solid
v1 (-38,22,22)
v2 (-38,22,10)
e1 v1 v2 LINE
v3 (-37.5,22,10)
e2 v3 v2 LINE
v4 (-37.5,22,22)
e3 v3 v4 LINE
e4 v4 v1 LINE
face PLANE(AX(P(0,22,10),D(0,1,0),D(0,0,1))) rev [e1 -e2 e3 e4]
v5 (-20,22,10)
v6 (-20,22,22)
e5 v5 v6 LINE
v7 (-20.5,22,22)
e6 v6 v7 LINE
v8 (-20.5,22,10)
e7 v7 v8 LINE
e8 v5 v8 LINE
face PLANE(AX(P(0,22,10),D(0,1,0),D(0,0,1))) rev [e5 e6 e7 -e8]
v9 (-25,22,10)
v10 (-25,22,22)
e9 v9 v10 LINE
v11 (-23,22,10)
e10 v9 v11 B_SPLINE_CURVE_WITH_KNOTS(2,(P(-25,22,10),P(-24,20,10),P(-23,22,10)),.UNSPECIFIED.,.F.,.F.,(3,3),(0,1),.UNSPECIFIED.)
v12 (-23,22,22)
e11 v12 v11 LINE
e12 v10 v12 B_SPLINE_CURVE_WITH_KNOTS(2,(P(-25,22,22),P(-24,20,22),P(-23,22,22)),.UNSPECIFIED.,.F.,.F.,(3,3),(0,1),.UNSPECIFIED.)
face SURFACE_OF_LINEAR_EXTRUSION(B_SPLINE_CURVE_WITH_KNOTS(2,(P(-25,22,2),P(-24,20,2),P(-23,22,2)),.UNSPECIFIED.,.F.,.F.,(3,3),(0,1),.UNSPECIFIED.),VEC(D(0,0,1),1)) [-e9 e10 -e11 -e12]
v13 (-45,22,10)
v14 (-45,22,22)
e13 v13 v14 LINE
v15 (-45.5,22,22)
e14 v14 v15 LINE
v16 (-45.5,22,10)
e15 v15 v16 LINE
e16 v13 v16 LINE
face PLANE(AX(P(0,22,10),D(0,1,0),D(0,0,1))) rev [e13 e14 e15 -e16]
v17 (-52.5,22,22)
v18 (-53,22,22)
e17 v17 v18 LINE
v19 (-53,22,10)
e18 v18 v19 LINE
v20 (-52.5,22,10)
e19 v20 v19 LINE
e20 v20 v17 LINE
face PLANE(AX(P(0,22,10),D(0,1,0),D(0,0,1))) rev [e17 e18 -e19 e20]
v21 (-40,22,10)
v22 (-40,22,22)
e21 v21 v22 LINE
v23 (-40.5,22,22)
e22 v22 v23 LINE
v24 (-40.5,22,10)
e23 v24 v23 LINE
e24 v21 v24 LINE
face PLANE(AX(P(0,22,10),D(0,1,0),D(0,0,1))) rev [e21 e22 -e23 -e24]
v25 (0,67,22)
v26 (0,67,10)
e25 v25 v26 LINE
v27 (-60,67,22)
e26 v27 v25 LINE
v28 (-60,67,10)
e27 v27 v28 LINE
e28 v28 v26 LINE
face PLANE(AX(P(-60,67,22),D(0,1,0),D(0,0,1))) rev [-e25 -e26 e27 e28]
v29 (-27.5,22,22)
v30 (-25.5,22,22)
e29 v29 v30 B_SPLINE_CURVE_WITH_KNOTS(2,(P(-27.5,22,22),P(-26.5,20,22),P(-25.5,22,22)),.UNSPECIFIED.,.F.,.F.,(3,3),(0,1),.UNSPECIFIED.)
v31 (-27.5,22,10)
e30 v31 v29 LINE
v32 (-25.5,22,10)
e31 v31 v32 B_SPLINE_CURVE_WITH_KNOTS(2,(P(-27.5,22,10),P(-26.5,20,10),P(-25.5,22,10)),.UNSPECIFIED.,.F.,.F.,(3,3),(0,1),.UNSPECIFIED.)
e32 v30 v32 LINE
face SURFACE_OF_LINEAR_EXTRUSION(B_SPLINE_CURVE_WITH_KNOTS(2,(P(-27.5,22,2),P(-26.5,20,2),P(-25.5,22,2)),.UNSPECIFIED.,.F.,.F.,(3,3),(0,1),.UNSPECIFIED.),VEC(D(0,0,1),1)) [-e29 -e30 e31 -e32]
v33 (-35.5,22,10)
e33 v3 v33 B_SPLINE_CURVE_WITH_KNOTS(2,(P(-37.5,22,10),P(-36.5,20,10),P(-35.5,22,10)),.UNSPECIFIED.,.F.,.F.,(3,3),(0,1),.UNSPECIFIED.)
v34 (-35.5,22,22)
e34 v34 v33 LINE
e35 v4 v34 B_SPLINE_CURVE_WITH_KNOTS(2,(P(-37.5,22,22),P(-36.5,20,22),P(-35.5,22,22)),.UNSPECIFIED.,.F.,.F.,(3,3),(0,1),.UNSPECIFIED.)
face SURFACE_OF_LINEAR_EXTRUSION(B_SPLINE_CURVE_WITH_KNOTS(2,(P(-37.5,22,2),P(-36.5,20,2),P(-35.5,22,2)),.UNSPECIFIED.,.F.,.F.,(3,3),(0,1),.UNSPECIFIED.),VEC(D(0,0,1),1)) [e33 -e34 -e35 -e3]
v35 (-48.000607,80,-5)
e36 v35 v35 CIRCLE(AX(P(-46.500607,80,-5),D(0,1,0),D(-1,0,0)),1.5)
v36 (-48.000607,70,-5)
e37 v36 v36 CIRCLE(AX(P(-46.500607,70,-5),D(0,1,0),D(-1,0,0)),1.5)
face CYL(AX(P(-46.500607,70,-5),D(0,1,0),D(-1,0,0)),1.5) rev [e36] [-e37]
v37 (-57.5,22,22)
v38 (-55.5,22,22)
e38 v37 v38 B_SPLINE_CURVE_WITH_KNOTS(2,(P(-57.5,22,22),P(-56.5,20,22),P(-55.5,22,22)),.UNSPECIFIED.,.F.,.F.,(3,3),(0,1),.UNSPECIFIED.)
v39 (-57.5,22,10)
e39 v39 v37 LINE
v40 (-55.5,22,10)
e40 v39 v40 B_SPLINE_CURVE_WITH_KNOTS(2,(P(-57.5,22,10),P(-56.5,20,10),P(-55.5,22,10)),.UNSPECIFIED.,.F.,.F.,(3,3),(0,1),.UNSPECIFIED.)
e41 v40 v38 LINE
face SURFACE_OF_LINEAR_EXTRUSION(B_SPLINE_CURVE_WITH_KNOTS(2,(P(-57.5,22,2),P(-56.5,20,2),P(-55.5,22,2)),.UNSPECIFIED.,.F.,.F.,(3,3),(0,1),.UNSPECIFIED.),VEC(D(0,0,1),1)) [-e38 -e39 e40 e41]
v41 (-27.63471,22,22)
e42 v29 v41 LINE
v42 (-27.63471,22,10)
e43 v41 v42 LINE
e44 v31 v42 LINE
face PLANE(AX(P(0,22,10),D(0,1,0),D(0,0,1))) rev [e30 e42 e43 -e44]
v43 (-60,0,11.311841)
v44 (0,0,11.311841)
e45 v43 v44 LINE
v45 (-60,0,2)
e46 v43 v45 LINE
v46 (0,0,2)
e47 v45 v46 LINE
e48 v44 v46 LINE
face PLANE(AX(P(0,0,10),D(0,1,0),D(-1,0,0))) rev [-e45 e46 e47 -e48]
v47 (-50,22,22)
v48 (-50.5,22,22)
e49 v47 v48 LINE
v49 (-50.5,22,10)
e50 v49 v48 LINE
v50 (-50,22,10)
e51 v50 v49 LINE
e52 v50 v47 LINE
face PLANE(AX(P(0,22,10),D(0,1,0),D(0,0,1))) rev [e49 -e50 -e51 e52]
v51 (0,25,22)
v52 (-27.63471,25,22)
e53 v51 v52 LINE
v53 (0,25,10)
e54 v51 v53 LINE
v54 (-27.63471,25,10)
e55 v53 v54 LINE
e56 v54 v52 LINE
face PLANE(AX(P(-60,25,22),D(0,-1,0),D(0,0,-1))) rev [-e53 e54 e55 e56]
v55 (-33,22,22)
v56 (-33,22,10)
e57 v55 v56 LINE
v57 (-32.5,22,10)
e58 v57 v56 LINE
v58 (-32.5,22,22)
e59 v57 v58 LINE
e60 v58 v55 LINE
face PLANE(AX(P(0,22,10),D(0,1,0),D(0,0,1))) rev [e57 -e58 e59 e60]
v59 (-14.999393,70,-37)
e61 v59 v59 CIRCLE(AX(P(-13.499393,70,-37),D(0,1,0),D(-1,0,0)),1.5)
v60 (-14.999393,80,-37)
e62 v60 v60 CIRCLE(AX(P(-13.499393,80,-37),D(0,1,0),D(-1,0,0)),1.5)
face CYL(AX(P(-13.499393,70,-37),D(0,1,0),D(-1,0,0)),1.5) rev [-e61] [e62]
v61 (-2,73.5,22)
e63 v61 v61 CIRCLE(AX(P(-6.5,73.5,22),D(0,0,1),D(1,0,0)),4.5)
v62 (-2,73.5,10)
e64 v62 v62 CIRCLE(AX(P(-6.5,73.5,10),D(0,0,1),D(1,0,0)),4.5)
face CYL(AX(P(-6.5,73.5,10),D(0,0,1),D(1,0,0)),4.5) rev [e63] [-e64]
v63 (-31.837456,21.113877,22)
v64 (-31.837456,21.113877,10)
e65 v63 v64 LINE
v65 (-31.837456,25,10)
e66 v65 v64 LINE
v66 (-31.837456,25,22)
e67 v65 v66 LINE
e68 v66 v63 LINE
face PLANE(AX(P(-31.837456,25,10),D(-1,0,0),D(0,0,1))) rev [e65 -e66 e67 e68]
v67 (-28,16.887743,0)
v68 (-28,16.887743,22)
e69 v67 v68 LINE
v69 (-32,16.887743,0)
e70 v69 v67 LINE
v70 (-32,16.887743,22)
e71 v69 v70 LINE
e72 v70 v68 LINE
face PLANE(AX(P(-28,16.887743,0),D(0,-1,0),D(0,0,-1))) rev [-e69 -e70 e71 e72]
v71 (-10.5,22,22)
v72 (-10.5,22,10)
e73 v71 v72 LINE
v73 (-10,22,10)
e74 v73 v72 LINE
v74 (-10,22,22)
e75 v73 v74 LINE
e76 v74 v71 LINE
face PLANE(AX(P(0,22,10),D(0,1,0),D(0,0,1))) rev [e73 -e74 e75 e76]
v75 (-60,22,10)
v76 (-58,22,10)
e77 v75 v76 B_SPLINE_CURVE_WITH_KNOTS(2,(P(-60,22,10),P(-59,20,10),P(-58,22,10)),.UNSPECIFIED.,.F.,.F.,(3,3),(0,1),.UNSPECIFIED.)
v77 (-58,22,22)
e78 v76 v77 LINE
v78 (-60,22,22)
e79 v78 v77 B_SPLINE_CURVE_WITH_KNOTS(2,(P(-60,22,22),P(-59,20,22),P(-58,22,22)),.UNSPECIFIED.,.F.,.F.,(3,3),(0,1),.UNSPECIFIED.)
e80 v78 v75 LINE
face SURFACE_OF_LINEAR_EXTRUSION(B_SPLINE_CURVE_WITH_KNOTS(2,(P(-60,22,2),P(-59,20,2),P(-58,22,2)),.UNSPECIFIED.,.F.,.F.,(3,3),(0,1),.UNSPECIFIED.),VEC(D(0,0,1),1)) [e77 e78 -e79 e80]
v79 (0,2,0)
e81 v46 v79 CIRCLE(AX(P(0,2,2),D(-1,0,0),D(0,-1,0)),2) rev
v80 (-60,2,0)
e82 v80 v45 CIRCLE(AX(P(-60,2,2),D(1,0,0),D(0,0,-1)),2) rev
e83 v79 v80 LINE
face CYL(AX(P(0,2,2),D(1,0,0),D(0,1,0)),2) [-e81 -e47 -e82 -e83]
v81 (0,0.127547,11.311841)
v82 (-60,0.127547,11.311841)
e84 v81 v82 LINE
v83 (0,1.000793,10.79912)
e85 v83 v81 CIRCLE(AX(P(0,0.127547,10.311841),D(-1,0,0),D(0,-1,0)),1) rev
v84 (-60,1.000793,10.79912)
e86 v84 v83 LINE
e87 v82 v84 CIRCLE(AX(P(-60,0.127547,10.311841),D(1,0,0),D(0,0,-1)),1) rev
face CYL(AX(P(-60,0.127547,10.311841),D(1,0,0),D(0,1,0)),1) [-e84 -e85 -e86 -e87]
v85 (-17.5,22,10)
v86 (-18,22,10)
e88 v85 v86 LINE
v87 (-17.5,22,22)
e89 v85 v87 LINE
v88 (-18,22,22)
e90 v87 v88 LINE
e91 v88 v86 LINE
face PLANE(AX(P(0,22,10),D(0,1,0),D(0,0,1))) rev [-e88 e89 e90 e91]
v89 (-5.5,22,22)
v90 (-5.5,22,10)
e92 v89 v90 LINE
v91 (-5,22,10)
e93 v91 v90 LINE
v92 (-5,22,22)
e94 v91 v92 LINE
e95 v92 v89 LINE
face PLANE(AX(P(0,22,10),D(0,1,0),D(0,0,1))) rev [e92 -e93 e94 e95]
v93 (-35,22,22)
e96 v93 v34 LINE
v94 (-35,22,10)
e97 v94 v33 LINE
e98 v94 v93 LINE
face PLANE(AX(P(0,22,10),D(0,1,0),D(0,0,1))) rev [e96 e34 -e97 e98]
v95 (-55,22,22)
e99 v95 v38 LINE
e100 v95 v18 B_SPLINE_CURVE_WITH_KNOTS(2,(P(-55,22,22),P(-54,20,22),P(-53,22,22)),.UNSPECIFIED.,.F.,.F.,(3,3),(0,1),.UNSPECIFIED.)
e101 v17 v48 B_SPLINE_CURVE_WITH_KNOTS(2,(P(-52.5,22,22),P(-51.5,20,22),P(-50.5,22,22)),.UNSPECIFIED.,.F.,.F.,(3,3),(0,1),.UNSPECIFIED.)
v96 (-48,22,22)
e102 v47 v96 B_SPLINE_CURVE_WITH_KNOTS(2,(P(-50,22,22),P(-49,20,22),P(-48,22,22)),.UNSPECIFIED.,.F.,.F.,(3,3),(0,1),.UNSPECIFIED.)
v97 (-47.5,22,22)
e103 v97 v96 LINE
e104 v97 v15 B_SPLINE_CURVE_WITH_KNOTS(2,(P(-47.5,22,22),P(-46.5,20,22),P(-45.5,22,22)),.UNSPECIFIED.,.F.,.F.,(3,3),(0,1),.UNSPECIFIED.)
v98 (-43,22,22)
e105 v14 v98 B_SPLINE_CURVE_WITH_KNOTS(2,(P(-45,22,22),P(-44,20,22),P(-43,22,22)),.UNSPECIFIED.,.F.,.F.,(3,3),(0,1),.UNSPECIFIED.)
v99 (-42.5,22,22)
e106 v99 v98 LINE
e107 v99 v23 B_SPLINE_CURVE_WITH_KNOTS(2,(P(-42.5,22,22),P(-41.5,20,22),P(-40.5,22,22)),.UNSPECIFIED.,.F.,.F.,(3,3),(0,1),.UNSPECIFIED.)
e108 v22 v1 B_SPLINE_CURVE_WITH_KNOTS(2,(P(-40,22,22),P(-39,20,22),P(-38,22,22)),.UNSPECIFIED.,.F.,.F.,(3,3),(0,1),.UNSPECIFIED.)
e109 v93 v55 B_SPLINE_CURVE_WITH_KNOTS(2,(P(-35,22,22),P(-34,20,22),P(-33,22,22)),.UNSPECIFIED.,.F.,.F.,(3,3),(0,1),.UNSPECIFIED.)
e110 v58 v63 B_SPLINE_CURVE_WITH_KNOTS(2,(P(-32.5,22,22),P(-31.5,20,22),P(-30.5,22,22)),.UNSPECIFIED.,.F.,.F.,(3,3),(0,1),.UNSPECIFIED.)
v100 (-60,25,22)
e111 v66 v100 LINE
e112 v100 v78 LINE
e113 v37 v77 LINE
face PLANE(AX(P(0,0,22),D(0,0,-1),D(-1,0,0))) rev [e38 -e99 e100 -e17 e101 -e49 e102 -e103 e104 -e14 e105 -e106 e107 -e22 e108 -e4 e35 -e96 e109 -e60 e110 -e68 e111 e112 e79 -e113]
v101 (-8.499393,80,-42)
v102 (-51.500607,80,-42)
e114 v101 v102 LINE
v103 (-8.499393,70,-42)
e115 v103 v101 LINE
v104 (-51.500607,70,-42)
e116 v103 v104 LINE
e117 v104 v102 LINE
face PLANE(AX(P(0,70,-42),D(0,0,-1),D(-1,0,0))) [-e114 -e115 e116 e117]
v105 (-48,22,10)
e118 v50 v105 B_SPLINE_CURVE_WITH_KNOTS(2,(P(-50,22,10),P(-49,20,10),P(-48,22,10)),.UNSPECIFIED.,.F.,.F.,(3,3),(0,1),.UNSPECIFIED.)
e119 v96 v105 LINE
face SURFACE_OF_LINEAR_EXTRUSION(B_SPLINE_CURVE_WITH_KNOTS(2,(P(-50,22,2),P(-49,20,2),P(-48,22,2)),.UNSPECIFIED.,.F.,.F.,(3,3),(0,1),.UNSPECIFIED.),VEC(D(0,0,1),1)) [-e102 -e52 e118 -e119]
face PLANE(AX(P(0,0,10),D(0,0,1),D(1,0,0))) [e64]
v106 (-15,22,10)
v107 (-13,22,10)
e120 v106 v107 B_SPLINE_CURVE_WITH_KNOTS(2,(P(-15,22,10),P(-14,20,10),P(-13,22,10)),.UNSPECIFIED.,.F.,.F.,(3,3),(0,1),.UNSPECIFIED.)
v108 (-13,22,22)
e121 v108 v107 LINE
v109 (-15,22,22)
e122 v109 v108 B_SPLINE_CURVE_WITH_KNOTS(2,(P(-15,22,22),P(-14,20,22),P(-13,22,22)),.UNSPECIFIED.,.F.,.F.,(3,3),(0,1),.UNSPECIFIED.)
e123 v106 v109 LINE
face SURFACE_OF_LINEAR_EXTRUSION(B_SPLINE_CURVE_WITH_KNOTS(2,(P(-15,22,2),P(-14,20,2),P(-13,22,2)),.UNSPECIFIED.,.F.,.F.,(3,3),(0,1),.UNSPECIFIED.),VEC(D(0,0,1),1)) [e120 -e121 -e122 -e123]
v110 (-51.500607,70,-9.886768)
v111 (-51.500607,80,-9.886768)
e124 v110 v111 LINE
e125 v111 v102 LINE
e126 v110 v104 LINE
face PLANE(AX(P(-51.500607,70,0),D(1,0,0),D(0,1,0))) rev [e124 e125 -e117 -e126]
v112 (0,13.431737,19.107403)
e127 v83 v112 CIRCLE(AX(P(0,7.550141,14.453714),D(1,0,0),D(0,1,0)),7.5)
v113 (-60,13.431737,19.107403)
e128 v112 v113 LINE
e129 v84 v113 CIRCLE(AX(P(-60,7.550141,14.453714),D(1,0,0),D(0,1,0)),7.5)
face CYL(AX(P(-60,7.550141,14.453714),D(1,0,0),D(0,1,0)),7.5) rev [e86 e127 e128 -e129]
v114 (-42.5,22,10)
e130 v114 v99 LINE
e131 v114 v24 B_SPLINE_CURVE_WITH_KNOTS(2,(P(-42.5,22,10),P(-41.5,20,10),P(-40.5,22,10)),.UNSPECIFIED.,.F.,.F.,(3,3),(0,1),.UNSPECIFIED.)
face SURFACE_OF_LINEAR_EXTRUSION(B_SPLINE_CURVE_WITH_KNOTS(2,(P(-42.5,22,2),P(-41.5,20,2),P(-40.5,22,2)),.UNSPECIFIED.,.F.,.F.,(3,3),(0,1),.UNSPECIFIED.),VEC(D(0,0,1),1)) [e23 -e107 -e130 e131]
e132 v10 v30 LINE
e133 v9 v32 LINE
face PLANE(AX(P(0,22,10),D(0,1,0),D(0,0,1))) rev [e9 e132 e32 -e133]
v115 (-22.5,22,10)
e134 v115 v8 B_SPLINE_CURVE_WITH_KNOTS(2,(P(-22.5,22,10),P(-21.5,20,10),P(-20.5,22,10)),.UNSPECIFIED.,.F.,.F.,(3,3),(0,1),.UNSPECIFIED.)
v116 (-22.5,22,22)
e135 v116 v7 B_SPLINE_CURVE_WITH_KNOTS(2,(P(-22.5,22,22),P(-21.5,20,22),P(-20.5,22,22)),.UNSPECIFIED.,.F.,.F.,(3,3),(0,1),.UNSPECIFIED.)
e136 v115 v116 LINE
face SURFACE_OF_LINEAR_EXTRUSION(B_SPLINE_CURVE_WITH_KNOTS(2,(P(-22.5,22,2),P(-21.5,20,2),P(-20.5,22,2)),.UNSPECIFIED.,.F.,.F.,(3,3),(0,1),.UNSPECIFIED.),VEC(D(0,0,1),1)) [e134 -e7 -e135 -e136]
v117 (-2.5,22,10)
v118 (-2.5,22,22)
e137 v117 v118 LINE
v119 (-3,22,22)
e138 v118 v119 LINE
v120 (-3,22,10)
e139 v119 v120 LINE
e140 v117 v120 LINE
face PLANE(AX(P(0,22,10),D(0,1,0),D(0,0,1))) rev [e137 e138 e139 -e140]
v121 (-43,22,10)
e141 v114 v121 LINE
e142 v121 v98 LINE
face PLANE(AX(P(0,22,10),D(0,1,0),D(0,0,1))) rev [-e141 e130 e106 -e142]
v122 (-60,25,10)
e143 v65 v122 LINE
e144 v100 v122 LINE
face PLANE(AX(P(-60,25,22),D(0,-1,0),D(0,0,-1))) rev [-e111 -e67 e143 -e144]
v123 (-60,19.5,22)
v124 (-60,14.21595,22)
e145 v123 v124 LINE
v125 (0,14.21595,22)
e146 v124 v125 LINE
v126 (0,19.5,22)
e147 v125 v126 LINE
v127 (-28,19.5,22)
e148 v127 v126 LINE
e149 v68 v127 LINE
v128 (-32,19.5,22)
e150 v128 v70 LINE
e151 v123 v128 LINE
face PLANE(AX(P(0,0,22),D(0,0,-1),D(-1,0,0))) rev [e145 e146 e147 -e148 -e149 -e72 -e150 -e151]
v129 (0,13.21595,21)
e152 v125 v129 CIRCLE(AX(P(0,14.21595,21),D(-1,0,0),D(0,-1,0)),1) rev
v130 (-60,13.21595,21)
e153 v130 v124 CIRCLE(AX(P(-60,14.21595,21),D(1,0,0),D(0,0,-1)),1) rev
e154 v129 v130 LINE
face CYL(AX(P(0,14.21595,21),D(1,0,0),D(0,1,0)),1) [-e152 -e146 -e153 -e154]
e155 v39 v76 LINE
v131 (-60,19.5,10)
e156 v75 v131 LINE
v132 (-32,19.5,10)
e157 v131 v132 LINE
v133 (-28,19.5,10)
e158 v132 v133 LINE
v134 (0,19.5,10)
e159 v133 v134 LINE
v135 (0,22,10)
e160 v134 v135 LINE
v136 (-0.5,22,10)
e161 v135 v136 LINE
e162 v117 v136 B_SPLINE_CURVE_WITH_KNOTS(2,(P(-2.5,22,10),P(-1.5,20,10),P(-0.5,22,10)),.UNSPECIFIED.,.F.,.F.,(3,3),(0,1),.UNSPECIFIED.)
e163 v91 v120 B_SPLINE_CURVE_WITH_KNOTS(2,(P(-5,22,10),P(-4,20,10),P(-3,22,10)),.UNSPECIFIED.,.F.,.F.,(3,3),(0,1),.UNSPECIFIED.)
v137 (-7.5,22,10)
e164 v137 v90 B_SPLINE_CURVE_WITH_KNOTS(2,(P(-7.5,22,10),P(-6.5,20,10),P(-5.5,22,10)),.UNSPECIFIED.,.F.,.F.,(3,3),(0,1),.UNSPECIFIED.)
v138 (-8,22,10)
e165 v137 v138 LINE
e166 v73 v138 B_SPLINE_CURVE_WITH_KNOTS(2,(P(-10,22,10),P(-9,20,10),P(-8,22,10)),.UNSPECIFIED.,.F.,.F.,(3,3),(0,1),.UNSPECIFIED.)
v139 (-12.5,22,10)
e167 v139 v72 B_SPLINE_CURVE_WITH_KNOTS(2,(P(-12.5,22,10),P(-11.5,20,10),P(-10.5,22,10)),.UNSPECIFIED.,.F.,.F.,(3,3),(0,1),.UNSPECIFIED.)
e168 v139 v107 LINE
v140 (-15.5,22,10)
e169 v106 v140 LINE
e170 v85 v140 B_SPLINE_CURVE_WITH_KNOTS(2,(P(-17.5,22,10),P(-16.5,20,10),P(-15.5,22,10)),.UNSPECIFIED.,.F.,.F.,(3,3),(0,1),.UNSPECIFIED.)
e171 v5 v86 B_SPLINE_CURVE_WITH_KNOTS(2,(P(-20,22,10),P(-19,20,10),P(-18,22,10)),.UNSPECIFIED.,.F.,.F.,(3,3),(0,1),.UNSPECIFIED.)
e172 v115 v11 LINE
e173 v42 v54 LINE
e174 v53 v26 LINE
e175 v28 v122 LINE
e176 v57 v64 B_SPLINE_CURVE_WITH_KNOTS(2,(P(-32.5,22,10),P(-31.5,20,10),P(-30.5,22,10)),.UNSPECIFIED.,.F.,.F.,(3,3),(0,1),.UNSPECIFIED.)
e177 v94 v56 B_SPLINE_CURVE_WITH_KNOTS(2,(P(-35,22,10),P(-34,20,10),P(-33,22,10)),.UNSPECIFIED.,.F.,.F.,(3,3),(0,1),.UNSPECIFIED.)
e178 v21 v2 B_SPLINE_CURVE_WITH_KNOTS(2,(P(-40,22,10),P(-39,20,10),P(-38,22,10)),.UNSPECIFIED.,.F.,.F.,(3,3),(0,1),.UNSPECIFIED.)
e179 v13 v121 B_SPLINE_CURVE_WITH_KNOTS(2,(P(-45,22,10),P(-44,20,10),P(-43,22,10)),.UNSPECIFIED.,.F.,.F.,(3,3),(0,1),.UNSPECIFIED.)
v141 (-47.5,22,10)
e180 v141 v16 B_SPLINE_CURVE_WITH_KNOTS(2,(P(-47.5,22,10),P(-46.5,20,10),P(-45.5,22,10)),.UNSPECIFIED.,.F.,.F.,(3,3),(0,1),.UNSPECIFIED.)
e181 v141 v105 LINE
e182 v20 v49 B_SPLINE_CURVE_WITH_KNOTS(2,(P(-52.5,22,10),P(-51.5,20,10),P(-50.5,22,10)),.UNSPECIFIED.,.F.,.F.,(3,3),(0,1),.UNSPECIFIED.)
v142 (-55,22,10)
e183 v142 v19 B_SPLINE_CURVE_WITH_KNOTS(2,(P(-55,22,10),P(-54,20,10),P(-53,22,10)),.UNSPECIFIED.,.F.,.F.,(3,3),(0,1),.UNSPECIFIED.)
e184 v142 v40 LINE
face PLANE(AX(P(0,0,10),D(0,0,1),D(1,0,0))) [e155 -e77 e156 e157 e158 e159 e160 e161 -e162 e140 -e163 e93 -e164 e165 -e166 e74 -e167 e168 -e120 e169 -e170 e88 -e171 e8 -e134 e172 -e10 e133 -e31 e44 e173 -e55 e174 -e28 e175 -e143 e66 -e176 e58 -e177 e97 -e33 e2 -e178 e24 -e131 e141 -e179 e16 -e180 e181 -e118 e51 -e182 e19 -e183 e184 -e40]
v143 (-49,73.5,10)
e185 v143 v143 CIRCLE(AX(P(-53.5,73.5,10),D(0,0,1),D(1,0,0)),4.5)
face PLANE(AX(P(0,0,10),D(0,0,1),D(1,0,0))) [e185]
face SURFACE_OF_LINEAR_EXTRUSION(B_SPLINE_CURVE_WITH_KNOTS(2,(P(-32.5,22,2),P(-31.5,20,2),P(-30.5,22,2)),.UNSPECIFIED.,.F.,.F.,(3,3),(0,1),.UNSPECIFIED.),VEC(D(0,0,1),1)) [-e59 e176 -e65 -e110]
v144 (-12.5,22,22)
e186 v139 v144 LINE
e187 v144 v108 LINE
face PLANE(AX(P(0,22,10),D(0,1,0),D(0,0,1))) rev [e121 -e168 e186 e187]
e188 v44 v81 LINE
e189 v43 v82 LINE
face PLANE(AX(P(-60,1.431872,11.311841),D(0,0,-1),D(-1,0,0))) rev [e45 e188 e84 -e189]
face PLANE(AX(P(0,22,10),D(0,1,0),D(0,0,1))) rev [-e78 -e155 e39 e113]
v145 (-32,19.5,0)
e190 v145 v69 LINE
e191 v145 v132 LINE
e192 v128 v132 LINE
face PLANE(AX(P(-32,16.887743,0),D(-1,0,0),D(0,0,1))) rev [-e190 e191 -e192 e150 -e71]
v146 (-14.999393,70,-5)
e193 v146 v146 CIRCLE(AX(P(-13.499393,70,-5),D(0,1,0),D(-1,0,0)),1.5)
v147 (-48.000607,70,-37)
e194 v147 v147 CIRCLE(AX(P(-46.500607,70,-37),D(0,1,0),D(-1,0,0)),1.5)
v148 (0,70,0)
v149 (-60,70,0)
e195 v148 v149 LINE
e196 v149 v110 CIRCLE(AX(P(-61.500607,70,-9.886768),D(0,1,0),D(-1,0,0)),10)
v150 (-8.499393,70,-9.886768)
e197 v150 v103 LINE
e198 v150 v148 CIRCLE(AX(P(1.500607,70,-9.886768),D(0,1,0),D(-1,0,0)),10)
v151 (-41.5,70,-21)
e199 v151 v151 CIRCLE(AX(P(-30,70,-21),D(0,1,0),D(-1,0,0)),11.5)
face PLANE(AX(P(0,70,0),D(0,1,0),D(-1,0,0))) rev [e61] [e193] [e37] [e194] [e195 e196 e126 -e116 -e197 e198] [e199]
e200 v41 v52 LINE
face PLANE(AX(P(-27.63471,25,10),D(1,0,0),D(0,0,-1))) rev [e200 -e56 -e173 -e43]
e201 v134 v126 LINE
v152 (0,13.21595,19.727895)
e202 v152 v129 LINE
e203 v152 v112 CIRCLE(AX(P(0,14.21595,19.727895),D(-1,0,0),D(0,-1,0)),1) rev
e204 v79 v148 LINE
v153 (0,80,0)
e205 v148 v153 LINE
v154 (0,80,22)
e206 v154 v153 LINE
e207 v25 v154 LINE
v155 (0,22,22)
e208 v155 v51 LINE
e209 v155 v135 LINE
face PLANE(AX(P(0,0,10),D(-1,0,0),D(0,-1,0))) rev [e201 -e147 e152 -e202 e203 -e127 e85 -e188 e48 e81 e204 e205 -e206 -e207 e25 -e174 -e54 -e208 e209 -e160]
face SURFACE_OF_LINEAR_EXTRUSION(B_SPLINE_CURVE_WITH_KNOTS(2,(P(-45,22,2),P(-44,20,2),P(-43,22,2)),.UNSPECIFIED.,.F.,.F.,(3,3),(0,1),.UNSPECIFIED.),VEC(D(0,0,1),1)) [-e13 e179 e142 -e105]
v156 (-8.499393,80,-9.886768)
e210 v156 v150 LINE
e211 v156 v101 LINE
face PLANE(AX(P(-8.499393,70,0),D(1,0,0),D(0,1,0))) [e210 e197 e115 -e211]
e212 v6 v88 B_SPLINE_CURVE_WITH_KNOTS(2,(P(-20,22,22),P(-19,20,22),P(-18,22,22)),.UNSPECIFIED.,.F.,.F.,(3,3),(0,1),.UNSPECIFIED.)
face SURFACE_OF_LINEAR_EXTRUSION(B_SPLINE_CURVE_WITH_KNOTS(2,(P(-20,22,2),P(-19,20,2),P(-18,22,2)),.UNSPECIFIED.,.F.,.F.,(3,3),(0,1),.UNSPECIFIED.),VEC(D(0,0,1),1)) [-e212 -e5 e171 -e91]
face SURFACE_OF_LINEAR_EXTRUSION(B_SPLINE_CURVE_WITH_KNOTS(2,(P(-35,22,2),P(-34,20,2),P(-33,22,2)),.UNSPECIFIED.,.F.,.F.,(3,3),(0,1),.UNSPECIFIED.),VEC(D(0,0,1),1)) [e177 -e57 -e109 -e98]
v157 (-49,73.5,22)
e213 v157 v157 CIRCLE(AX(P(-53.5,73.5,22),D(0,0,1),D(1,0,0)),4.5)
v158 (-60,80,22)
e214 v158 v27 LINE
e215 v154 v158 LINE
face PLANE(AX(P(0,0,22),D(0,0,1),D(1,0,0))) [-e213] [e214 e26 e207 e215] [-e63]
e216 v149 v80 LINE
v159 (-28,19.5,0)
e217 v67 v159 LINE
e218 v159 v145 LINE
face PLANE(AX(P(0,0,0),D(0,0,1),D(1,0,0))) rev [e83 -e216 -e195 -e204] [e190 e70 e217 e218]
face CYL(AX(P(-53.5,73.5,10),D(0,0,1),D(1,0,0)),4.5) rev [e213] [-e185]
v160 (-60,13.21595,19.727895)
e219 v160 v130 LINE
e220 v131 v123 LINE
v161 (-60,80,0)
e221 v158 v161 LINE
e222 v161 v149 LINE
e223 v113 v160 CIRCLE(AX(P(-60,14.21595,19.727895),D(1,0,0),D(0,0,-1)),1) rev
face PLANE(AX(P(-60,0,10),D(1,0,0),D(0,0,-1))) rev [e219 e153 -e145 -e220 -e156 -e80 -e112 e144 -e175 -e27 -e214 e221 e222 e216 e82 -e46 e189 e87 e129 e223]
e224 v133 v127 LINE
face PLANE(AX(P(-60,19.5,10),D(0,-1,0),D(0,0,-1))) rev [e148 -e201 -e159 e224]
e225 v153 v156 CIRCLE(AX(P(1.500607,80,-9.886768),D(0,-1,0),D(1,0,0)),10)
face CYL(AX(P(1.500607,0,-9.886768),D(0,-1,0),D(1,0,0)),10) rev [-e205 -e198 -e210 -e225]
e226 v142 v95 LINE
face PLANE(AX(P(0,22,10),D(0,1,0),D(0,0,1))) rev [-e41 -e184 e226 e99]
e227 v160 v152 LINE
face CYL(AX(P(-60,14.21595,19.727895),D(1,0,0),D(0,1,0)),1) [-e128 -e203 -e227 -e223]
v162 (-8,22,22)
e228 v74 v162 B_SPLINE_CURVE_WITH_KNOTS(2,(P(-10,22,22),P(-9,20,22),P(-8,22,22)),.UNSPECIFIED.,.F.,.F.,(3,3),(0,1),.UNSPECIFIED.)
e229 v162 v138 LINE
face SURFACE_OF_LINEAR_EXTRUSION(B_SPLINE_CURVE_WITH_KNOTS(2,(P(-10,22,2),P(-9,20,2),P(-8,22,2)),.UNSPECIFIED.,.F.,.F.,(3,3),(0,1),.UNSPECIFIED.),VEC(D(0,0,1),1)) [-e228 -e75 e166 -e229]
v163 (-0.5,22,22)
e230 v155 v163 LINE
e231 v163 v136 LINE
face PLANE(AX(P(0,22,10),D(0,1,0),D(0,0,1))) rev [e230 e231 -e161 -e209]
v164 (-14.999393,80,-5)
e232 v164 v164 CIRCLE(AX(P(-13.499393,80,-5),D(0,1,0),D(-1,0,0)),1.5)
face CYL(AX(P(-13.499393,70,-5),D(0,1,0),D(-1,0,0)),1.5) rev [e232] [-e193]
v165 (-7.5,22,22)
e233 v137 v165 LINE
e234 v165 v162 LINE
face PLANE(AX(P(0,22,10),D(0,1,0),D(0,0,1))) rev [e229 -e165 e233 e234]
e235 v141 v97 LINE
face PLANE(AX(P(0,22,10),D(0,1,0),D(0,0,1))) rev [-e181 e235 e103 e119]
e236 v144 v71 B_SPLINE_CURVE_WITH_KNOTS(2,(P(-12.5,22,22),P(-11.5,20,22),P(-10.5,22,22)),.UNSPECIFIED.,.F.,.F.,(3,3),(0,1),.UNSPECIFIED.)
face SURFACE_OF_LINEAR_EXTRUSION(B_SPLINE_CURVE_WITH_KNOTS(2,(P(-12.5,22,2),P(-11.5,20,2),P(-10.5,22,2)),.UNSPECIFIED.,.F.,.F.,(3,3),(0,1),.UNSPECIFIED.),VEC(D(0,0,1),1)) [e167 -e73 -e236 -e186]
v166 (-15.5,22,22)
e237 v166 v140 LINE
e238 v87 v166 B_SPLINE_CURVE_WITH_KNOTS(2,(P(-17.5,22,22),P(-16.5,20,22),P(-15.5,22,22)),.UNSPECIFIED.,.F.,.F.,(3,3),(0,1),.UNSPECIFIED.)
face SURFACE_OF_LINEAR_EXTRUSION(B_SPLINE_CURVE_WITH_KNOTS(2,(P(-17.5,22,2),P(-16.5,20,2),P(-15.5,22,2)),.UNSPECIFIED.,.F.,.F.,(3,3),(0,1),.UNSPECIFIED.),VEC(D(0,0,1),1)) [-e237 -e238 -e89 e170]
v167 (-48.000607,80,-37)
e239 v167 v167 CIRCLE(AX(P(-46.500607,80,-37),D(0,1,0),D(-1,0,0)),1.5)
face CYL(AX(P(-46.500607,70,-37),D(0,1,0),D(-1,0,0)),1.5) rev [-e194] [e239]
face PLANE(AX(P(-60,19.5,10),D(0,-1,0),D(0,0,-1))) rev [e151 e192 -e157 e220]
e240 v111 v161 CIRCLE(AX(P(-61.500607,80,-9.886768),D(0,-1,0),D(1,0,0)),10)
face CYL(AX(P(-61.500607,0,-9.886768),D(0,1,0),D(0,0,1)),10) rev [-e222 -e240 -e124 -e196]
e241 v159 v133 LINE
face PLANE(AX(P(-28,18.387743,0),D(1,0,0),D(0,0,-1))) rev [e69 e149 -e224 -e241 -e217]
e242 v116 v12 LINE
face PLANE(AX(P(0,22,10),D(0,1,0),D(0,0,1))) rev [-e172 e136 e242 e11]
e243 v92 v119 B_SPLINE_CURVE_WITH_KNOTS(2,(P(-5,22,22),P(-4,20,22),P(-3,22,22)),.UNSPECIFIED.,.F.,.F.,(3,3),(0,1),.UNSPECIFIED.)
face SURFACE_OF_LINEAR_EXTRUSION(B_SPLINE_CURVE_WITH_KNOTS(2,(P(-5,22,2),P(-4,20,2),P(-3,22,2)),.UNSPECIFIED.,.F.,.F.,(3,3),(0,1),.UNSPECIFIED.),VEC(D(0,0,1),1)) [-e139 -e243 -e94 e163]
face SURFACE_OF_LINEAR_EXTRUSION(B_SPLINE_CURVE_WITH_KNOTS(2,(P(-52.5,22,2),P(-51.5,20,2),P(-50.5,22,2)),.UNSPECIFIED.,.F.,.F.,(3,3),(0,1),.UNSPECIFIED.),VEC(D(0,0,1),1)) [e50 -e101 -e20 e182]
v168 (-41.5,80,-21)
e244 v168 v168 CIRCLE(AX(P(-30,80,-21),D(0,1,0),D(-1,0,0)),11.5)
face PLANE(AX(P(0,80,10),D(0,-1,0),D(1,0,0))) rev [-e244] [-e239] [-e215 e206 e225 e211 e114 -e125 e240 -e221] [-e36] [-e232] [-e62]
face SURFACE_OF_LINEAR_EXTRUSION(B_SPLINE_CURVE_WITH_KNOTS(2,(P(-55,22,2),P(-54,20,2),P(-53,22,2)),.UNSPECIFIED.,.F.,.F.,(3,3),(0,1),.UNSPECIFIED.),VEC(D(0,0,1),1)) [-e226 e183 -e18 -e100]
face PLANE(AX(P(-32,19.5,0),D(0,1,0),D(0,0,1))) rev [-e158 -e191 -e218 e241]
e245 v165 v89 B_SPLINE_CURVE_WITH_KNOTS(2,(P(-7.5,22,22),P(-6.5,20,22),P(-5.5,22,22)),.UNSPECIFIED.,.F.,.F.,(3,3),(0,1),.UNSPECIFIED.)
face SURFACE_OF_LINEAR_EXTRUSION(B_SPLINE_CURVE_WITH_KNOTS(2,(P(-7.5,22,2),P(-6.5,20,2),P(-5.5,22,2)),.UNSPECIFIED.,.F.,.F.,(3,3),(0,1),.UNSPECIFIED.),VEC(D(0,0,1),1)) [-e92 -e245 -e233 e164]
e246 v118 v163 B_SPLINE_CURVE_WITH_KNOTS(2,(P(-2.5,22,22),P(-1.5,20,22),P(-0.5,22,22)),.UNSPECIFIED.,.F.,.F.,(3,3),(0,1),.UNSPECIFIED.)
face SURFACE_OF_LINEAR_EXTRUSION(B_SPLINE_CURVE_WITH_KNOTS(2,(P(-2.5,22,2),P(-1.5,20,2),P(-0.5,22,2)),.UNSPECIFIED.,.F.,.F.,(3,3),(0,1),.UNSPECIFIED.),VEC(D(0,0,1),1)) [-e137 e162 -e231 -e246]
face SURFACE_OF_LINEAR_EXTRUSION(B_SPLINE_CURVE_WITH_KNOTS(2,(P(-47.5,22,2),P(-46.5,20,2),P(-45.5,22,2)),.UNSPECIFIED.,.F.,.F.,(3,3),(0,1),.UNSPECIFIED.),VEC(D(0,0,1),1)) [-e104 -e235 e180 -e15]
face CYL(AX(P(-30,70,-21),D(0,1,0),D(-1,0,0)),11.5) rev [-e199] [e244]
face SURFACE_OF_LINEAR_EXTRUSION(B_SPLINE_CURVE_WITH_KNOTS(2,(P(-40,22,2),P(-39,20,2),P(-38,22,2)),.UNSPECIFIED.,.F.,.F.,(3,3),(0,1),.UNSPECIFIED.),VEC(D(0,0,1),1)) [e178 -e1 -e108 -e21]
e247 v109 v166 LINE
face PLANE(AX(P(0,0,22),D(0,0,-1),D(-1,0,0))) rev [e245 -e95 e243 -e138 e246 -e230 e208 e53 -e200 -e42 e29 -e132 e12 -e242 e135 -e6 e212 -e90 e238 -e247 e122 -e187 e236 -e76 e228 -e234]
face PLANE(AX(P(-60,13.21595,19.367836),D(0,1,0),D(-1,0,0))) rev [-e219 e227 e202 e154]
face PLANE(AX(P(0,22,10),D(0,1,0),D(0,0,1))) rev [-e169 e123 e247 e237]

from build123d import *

# Parameters (mm, degrees)
SKETCH_1_W           = 60
SKETCH_1_H           = 80
EXTRUDE_1_DEPTH      = 10
SKETCH_2_W           = 60
SKETCH_2_H           = 13
SKETCH_2_R           = 4
EXTRUDE_2_DEPTH      = 12
SKETCH_3_W           = 60
SKETCH_3_H           = 20
EXTRUDE_3_DEPTH      = 12
SKETCH_6_R           = 7.5
CUT_EXTRUDE_1_DEPTH  = 60
CUT_EXTRUDE_3_DEPTH  = 60
CUT_EXTRUDE_6_DEPTH  = 60
FILLET_11_R          = 1
SKETCH_11_W          = 60
SKETCH_11_H          = 3.5
EXTRUDE_4_DEPTH      = 12
SKETCH_14_W          = 4
SKETCH_14_H          = 1.5
CUT_EXTRUDE_8_DEPTH  = 22
FILLET_12_R          = 2
SKETCH_15_W          = 12
SKETCH_15_H          = 0.5
CUT_EXTRUDE_9_DEPTH  = 103.391405889
EXTRUDE_5_DEPTH      = 20
SKETCH_19_W          = 60
SKETCH_19_H          = 0.5
SKETCH_19_W_2        = 4.202746251
SKETCH_19_H_2        = 4
CUT_EXTRUDE_10_DEPTH = 12
SKETCH_21_W          = 4
SKETCH_21_H          = 1.112257447
CUT_EXTRUDE_12_DEPTH = 103.391405948
SKETCH_22_R          = 4.5
CUT_EXTRUDE_14_DEPTH = 12
SKETCH_23_R          = 1.5
EXTRUDE_6_DEPTH      = 10
FILLET_13_R          = 10


with BuildPart() as part:
    # 스케치1 → 보스-돌출1 (new body)
    with BuildSketch(Plane.XY):
        with Locations((-30, 40)):
            Rectangle(SKETCH_1_W, SKETCH_1_H)
    extrude(amount=EXTRUDE_1_DEPTH)

    # 스케치2 → 보스-돌출2 (add)
    with BuildSketch(Plane.XY.offset(10)):
        with Locations((-30, 73.5)):
            Rectangle(SKETCH_2_W, SKETCH_2_H)
        with Locations((-6.5, 73.5)):
            Circle(SKETCH_2_R, mode=Mode.SUBTRACT)
        with Locations((-53.5, 73.5)):
            Circle(SKETCH_2_R, mode=Mode.SUBTRACT)
    extrude(amount=EXTRUDE_2_DEPTH)

    # 스케치3 → 보스-돌출3 (add)
    with BuildSketch(Plane.XY.offset(10)):
        with Locations((-30, 10)):
            Rectangle(SKETCH_3_W, SKETCH_3_H)
    extrude(amount=EXTRUDE_3_DEPTH)

    # 스케치6 → 컷-돌출1 (cut)
    with BuildSketch(Plane(origin=(0, 0, 0), x_dir=(0, 0, -1), z_dir=(1, 0, 0))):
        with Locations(Location((-14.4537136, 7.550140621, 0), (0, 0, 90))):
            Circle(SKETCH_6_R)
    extrude(amount=-CUT_EXTRUDE_1_DEPTH, mode=Mode.SUBTRACT)

    # 스케치8 → 컷-돌출3 (cut)
    with BuildSketch(Plane(origin=(0, 0, 0), x_dir=(0, 0, -1), z_dir=(1, 0, 0))):
        Polygon((-14.254234553, 0), (-22, 0), (-22, 7.752485681), align=None)
    extrude(amount=-CUT_EXTRUDE_3_DEPTH, mode=Mode.SUBTRACT)

    # 스케치10 → 컷-돌출6 (cut)
    with BuildSketch(Plane(origin=(0, 0, 0), x_dir=(0, 0, -1), z_dir=(1, 0, 0))):
        Polygon((-19.367836468, 13.215950046), (-22, 13.215950046), (-22, 7.475911399), align=None)
        Polygon((-11.311841371, 0), (-15.135533844, 0), (-11.311841371, 1.431872303), align=None)
    extrude(amount=-CUT_EXTRUDE_6_DEPTH, mode=Mode.SUBTRACT)

    # 필렛11
    fillet_11_edges = [part.edges().sort_by_distance(p)[0] for p in [
        (-30, 0.739954215, 11.311841371),
        (-30, 13.215950046, 19.367836468),
        (-30, 13.215950046, 22),
    ]]
    fillet(fillet_11_edges, radius=FILLET_11_R)

    # 스케치11 → 보스-돌출4 (add)
    with BuildSketch(Plane.XY.offset(10)):
        with Locations((-30, 23.25)):
            Rectangle(SKETCH_11_W, SKETCH_11_H)
    extrude(amount=EXTRUDE_4_DEPTH)

    # 스케치14 → 컷-돌출8 (cut)
    with BuildSketch(Plane.XY.offset(22)):
        with Locations((-30, 17.637742553)):
            Rectangle(SKETCH_14_W, SKETCH_14_H)
    extrude(amount=-CUT_EXTRUDE_8_DEPTH, mode=Mode.SUBTRACT)

    # 필렛12
    fillet_12_edges = [part.edges().sort_by_distance(p)[0] for p in [
        (-30, 0, 0),
    ]]
    fillet(fillet_12_edges, radius=FILLET_12_R)

    # 스케치15 → 컷-돌출9 (cut, through all)
    with BuildSketch(Plane.ZY.offset(60)):
        with Locations((16, 21.75)):
            Rectangle(SKETCH_15_W, SKETCH_15_H)
    extrude(amount=-CUT_EXTRUDE_9_DEPTH, mode=Mode.SUBTRACT)

    # 스케치18 → 보스-돌출5 (add)
    with BuildSketch(Plane.XY.offset(22)):
        with BuildLine():
            Line((-60, 22), (-58, 22))
            add(Edge.make_bspline(
                [(-60, 22), (-59, 20), (-58, 22)],
                knots=[0, 0, 0, 1, 1, 1], degree=2))
        make_face()
        with BuildLine():
            Line((-57.5, 22), (-55.5, 22))
            add(Edge.make_bspline(
                [(-57.5, 22), (-56.5, 20), (-55.5, 22)],
                knots=[0, 0, 0, 1, 1, 1], degree=2))
        make_face()
        with BuildLine():
            Line((-55, 22), (-53, 22))
            add(Edge.make_bspline(
                [(-55, 22), (-54, 20), (-53, 22)],
                knots=[0, 0, 0, 1, 1, 1], degree=2))
        make_face()
        with BuildLine():
            Line((-52.5, 22), (-50.5, 22))
            add(Edge.make_bspline(
                [(-52.5, 22), (-51.5, 20), (-50.5, 22)],
                knots=[0, 0, 0, 1, 1, 1], degree=2))
        make_face()
        with BuildLine():
            Line((-50, 22), (-48, 22))
            add(Edge.make_bspline(
                [(-50, 22), (-49, 20), (-48, 22)],
                knots=[0, 0, 0, 1, 1, 1], degree=2))
        make_face()
        with BuildLine():
            Line((-47.5, 22), (-45.5, 22))
            add(Edge.make_bspline(
                [(-47.5, 22), (-46.5, 20), (-45.5, 22)],
                knots=[0, 0, 0, 1, 1, 1], degree=2))
        make_face()
        with BuildLine():
            Line((-45, 22), (-43, 22))
            add(Edge.make_bspline(
                [(-45, 22), (-44, 20), (-43, 22)],
                knots=[0, 0, 0, 1, 1, 1], degree=2))
        make_face()
        with BuildLine():
            Line((-42.5, 22), (-40.5, 22))
            add(Edge.make_bspline(
                [(-42.5, 22), (-41.5, 20), (-40.5, 22)],
                knots=[0, 0, 0, 1, 1, 1], degree=2))
        make_face()
        with BuildLine():
            Line((-40, 22), (-38, 22))
            add(Edge.make_bspline(
                [(-40, 22), (-39, 20), (-38, 22)],
                knots=[0, 0, 0, 1, 1, 1], degree=2))
        make_face()
        with BuildLine():
            Line((-37.5, 22), (-35.5, 22))
            add(Edge.make_bspline(
                [(-37.5, 22), (-36.5, 20), (-35.5, 22)],
                knots=[0, 0, 0, 1, 1, 1], degree=2))
        make_face()
        with BuildLine():
            Line((-35, 22), (-33, 22))
            add(Edge.make_bspline(
                [(-35, 22), (-34, 20), (-33, 22)],
                knots=[0, 0, 0, 1, 1, 1], degree=2))
        make_face()
        with BuildLine():
            Line((-32.5, 22), (-30.5, 22))
            add(Edge.make_bspline(
                [(-32.5, 22), (-31.5, 20), (-30.5, 22)],
                knots=[0, 0, 0, 1, 1, 1], degree=2))
        make_face()
        with BuildLine():
            Line((-30, 22), (-28, 22))
            add(Edge.make_bspline(
                [(-30, 22), (-29, 20), (-28, 22)],
                knots=[0, 0, 0, 1, 1, 1], degree=2))
        make_face()
        with BuildLine():
            Line((-27.5, 22), (-25.5, 22))
            add(Edge.make_bspline(
                [(-27.5, 22), (-26.5, 20), (-25.5, 22)],
                knots=[0, 0, 0, 1, 1, 1], degree=2))
        make_face()
        with BuildLine():
            Line((-25, 22), (-23, 22))
            add(Edge.make_bspline(
                [(-25, 22), (-24, 20), (-23, 22)],
                knots=[0, 0, 0, 1, 1, 1], degree=2))
        make_face()
        with BuildLine():
            Line((-22.5, 22), (-20.5, 22))
            add(Edge.make_bspline(
                [(-22.5, 22), (-21.5, 20), (-20.5, 22)],
                knots=[0, 0, 0, 1, 1, 1], degree=2))
        make_face()
        with BuildLine():
            Line((-20, 22), (-18, 22))
            add(Edge.make_bspline(
                [(-20, 22), (-19, 20), (-18, 22)],
                knots=[0, 0, 0, 1, 1, 1], degree=2))
        make_face()
        with BuildLine():
            Line((-17.5, 22), (-15.5, 22))
            add(Edge.make_bspline(
                [(-17.5, 22), (-16.5, 20), (-15.5, 22)],
                knots=[0, 0, 0, 1, 1, 1], degree=2))
        make_face()
        with BuildLine():
            Line((-15, 22), (-13, 22))
            add(Edge.make_bspline(
                [(-15, 22), (-14, 20), (-13, 22)],
                knots=[0, 0, 0, 1, 1, 1], degree=2))
        make_face()
        with BuildLine():
            Line((-12.5, 22), (-10.5, 22))
            add(Edge.make_bspline(
                [(-12.5, 22), (-11.5, 20), (-10.5, 22)],
                knots=[0, 0, 0, 1, 1, 1], degree=2))
        make_face()
        with BuildLine():
            Line((-10, 22), (-8, 22))
            add(Edge.make_bspline(
                [(-10, 22), (-9, 20), (-8, 22)],
                knots=[0, 0, 0, 1, 1, 1], degree=2))
        make_face()
        with BuildLine():
            Line((-7.5, 22), (-5.5, 22))
            add(Edge.make_bspline(
                [(-7.5, 22), (-6.5, 20), (-5.5, 22)],
                knots=[0, 0, 0, 1, 1, 1], degree=2))
        make_face()
        with BuildLine():
            Line((-5, 22), (-3, 22))
            add(Edge.make_bspline(
                [(-5, 22), (-4, 20), (-3, 22)],
                knots=[0, 0, 0, 1, 1, 1], degree=2))
        make_face()
        with BuildLine():
            Line((-2.5, 22), (-0.5, 22))
            add(Edge.make_bspline(
                [(-2.5, 22), (-1.5, 20), (-0.5, 22)],
                knots=[0, 0, 0, 1, 1, 1], degree=2))
        make_face()
    extrude(amount=-EXTRUDE_5_DEPTH)

    # 스케치19 → 컷-돌출10 (cut)
    with BuildSketch(Plane.XY.offset(22)):
        with Locations((-30, 19.75)):
            Rectangle(SKETCH_19_W, SKETCH_19_H)
        with Locations((-29.736082812, 23)):
            Rectangle(SKETCH_19_W_2, SKETCH_19_H_2)
    extrude(amount=-CUT_EXTRUDE_10_DEPTH, mode=Mode.SUBTRACT)

    # 스케치21 → 컷-돌출12 (cut, through all)
    with BuildSketch(Plane.XY.offset(22)):
        with Locations((-30, 18.943871277)):
            Rectangle(SKETCH_21_W, SKETCH_21_H)
    extrude(amount=-CUT_EXTRUDE_12_DEPTH, mode=Mode.SUBTRACT)

    # 스케치22 → 컷-돌출14 (cut)
    with BuildSketch(Plane.XY.offset(22)):
        with Locations((-53.5, 73.5)):
            Circle(SKETCH_22_R)
        with Locations((-6.5, 73.5)):
            Circle(SKETCH_22_R)
    extrude(amount=-CUT_EXTRUDE_14_DEPTH, mode=Mode.SUBTRACT)

    # 스케치23 → 보스-돌출6 (add)
    # profile 1 of 3: a face of its own
    with BuildSketch(Plane(origin=(0, 80, 0), x_dir=(1, 0, 0), z_dir=(0, 1, 0))):
        with BuildLine():
            Line((-30, 0), (-8.499392674, 0))
            Line((-8.499392674, 0), (-8.499392674, 42))
            Line((-8.499392674, 42), (-30, 42))
            Line((-30, 42), (-30, 32.5))
            ThreePointArc((-30, 32.5), (-21.868272016, 29.131727984), (-18.5, 21))
            ThreePointArc((-18.5, 21), (-21.868272016, 12.868272016), (-30, 9.5))
            Line((-30, 9.5), (-30, 0))
        make_face()
        with Locations(Location((-13.499392674, 5, 0), (0, 0, 180))):
            Circle(SKETCH_23_R, mode=Mode.SUBTRACT)
        with Locations(Location((-13.499392674, 37, 0), (0, 0, 180))):
            Circle(SKETCH_23_R, mode=Mode.SUBTRACT)
    # profile 2 of 3: a face of its own
    with BuildSketch(Plane(origin=(0, 80, 0), x_dir=(1, 0, 0), z_dir=(0, 1, 0))):
        with BuildLine():
            Line((-46.500607326, 0), (-30, 0))
            Line((-30, 0), (-30, 9.5))
            ThreePointArc((-30, 9.5), (-41.5, 21), (-30, 32.5))
            Line((-30, 32.5), (-30, 42))
            Line((-30, 42), (-51.500607326, 42))
            Line((-51.500607326, 42), (-51.500607326, 5))
            Line((-51.500607326, 5), (-48.000607326, 5))
            ThreePointArc((-48.000607326, 5), (-46.500607326, 6.5), (-45.000607326, 5))
            ThreePointArc((-45.000607326, 5), (-45.439947155, 3.939339828), (-46.500607326, 3.5))
            Line((-46.500607326, 3.5), (-46.500607326, 0))
        make_face()
        with Locations(Location((-46.500607326, 37, 0), (0, 0, 180))):
            Circle(SKETCH_23_R, mode=Mode.SUBTRACT)
    # profile 3 of 3: a face of its own
    with BuildSketch(Plane(origin=(0, 80, 0), x_dir=(1, 0, 0), z_dir=(0, 1, 0))):
        with BuildLine():
            Line((-51.500607326, 0), (-46.500607326, 0))
            Line((-46.500607326, 0), (-46.500607326, 3.5))
            ThreePointArc((-46.500607326, 3.5), (-47.561267498, 3.939339828), (-48.000607326, 5))
            Line((-48.000607326, 5), (-51.500607326, 5))
            Line((-51.500607326, 5), (-51.500607326, 0))
        make_face()
    extrude(amount=-EXTRUDE_6_DEPTH)

    # 필렛13
    # the kernel refuses this fillet: 10 mm, written as the material it adds along each edge
    with BuildSketch(Plane(origin=(-8.499392674, 80, 0), x_dir=(1, 0, 0), z_dir=(0, -1, 0))) as fillet_13_piece_1:
        with BuildLine():
            CenterArc((10, -9.886767806), FILLET_13_R, 98.630446119, 81.369553881)
            Line((0, -9.886767806), (-0.2, -9.886767806))
            Line((-0.2, -9.886767806), (-0.2, 0))
            Line((-0.2, 0), (0, 0.2))
            ThreePointArc((0, 0.2), (4.249696337, 0.2), (8.469380527, 0.197735356))
            Line((8.469380527, 0.197735356), (8.499392674, 0))
        make_face()
    extrude(amount=10)
    with BuildSketch(Plane(origin=(-51.500607326, 80, 0), x_dir=(-1, 0, 0), z_dir=(0, -1, 0))) as fillet_13_piece_2:
        with BuildLine():
            CenterArc((10, 9.886767806), FILLET_13_R, 180, 81.369553881)
            Line((0, 9.886767806), (-0.2, 9.886767806))
            Line((-0.2, 9.886767806), (-0.2, 0))
            Line((-0.2, 0), (0, -0.2))
            ThreePointArc((0, -0.2), (4.249696337, -0.2), (8.469380527, -0.197735356))
            Line((8.469380527, -0.197735356), (8.499392674, 0))
        make_face()
    extrude(amount=10)


solid = part.part
